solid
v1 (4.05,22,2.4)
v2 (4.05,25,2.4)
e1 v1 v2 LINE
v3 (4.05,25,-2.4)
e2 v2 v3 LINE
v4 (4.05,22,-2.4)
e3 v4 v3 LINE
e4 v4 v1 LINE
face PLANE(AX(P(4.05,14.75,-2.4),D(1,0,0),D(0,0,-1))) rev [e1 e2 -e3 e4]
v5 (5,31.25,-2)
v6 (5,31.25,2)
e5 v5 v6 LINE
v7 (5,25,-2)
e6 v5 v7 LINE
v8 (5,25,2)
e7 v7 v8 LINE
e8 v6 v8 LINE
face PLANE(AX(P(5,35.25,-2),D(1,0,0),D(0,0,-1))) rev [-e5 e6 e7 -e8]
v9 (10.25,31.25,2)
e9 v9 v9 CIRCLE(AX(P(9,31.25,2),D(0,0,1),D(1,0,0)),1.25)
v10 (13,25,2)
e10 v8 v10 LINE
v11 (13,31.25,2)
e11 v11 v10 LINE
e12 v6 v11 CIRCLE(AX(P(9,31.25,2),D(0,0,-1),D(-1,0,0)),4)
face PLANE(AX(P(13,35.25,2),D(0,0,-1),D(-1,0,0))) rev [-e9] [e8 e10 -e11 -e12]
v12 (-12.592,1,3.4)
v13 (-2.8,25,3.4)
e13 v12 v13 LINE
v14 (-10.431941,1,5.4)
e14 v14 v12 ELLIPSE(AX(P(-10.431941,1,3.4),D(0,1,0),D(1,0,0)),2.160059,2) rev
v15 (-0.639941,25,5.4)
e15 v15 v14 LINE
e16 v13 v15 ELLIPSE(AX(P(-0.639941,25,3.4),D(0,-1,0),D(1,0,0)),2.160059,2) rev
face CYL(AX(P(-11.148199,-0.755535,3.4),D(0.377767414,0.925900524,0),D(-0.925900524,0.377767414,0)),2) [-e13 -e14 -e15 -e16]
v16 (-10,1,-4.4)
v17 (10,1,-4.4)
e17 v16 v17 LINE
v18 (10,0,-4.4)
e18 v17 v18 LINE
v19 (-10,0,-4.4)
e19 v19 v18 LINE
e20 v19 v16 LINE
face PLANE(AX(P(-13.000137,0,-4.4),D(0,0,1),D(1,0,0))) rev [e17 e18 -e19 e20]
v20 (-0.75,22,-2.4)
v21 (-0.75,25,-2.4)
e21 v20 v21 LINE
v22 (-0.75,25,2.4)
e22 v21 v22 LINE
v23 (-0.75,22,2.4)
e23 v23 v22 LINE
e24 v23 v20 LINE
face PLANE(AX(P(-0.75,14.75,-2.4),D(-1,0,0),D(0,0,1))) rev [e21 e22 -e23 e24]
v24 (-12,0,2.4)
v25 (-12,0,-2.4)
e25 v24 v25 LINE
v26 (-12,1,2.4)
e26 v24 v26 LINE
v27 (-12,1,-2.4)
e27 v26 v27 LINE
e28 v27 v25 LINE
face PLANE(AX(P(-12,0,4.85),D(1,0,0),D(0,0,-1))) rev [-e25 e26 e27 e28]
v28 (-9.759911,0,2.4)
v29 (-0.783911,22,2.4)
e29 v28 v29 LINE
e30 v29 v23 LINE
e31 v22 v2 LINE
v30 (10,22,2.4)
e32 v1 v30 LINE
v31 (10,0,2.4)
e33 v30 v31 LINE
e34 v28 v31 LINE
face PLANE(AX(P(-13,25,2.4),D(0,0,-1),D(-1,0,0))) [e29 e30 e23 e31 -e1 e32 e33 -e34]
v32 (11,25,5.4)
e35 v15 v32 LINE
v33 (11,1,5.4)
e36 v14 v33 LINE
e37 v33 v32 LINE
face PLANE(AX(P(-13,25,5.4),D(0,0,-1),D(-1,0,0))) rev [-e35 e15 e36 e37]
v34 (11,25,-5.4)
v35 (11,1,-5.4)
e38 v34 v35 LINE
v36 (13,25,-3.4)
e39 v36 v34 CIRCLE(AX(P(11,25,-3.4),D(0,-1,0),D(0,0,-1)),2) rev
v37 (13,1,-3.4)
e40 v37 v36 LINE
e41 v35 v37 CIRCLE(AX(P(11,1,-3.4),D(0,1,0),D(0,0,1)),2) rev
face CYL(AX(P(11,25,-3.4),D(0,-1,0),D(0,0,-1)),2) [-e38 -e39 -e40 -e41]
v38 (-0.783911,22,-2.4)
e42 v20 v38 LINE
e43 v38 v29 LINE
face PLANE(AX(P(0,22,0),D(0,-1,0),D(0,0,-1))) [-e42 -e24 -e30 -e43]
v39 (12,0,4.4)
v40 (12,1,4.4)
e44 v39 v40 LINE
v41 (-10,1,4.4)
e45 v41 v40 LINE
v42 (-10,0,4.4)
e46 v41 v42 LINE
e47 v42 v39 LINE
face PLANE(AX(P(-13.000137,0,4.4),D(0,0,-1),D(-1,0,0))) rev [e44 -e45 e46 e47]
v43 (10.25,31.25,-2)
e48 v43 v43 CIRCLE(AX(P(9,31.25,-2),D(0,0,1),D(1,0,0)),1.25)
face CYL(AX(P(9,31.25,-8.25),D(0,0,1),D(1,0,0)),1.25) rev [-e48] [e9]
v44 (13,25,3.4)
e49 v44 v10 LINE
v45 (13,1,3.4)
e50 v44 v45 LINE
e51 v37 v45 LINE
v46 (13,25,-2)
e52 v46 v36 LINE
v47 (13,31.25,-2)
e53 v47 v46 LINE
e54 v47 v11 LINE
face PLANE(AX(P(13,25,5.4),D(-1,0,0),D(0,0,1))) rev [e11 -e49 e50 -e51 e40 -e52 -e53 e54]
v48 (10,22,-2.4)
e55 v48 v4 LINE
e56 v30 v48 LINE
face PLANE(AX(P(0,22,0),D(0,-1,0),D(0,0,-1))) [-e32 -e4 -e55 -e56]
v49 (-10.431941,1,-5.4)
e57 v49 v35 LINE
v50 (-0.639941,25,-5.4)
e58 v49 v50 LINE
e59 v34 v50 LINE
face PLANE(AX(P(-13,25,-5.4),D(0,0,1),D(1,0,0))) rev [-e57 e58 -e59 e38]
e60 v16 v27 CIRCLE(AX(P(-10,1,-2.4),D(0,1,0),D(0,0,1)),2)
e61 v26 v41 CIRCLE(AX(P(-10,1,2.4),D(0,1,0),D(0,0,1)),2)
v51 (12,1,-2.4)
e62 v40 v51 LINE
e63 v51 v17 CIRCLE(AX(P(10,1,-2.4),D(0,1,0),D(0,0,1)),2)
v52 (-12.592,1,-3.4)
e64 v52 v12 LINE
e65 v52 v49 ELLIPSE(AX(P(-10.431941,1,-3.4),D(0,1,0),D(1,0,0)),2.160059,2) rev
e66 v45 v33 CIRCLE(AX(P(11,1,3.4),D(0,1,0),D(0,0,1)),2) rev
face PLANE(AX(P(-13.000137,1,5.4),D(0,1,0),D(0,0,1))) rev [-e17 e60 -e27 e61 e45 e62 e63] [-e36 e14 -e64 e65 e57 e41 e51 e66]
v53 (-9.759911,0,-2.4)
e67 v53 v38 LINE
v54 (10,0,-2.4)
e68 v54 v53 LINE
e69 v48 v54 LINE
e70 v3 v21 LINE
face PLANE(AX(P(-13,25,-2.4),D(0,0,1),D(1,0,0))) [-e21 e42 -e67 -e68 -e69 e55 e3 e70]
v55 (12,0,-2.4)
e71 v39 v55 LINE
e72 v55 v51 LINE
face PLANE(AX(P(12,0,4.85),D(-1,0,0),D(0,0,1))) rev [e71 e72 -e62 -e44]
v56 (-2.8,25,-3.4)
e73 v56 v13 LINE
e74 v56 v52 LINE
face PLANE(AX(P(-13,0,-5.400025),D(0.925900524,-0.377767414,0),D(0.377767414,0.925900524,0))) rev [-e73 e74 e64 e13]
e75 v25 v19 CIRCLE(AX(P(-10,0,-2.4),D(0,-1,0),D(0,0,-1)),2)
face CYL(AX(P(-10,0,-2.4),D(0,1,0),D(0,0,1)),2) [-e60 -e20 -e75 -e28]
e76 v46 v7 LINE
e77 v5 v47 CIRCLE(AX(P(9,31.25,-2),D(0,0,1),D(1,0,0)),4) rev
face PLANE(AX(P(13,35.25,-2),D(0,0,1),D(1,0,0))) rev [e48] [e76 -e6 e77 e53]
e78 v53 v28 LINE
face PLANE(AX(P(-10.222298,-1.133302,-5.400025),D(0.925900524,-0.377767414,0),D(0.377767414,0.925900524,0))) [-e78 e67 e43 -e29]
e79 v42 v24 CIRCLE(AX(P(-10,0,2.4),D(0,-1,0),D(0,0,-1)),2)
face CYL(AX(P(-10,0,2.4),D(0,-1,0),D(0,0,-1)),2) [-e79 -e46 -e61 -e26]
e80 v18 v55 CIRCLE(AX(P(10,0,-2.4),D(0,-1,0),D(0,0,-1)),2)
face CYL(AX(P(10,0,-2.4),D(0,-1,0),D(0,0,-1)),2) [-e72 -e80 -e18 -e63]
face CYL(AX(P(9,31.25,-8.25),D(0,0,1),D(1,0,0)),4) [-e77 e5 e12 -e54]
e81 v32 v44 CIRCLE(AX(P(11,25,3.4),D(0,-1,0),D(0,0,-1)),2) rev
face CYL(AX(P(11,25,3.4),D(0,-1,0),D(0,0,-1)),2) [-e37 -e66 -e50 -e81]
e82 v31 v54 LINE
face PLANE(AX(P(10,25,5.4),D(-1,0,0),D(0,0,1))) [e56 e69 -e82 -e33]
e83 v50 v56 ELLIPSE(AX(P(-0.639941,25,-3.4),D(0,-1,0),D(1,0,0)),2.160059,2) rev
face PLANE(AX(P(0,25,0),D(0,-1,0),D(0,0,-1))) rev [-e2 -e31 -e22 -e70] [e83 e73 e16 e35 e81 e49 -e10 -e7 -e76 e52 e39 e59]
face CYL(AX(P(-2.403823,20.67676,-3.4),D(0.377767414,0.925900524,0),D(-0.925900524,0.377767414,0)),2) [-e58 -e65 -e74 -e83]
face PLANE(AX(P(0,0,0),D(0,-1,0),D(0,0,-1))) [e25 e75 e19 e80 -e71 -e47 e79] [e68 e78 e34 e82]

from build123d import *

# Parameters (mm, degrees)
SKETCH1_W           = 26
SKETCH1_H           = 10.8
BOSS_EXTRUDE1_DEPTH = 25
SKETCH2_W           = 8
SKETCH2_H           = 4
BOSS_EXTRUDE2_DEPTH = 10.25
SKETCH3_R           = 1.25
CUT_EXTRUDE1_DEPTH  = 10.25
CUT_EXTRUDE2_DEPTH  = 40.092230686
SHELL1_START        = -2.4
SHELL1_DEPTH        = 4.8
SKETCH5_W           = 4.8
SKETCH5_H           = 4.8
CUT_EXTRUDE3_DEPTH  = 10.25
SKETCH6_W           = 1
SKETCH6_H           = 1
CUT_EXTRUDE4_DEPTH  = 45.133009188
SKETCH7_W           = 1
SKETCH7_H           = 1
CUT_EXTRUDE5_DEPTH  = 10.25
FILLET1_R           = 2
FILLET2_R           = 2


# Read off the part's stored shape, not the designer's step: Shell1
with BuildPart() as part:
    # Sketch1 → Boss-Extrude1 (new body)
    with BuildSketch(Plane(origin=(0, 0, 0), x_dir=(1, 0, 0), z_dir=(0, 1, 0))):
        Rectangle(SKETCH1_W, SKETCH1_H)
    extrude(amount=BOSS_EXTRUDE1_DEPTH)

    # Sketch2 → Boss-Extrude2 (add)
    with BuildSketch(Plane(origin=(0, 25, 0), x_dir=(1, 0, 0), z_dir=(0, 1, 0))):
        with Locations((9, 0)):
            Rectangle(SKETCH2_W, SKETCH2_H)
    extrude(amount=BOSS_EXTRUDE2_DEPTH)

    # Sketch3 → Cut-Extrude1 (cut)
    with BuildSketch(Plane.XY.offset(2)):
        with Locations((9, 31.25)):
            Circle(SKETCH3_R)
        with BuildLine():
            Line((5, 31.25), (5, 37.25))
            Line((5, 37.25), (13, 37.25))
            Line((13, 37.25), (13, 31.25))
            ThreePointArc((13, 31.25), (9, 35.25), (5, 31.25))
        make_face()
    extrude(amount=-CUT_EXTRUDE1_DEPTH, mode=Mode.SUBTRACT)

    # Sketch4 → Cut-Extrude2 (cut, through all)
    with BuildSketch(Plane.XY.offset(5.4)):
        Polygon((-13, 0), (-2.8, 25), (-13, 25), align=None)
    extrude(amount=-CUT_EXTRUDE2_DEPTH, mode=Mode.SUBTRACT)

    # Shell1 outline → Shell1 (cut)
    with BuildSketch(Plane.XY.offset(SHELL1_START)):
        Polygon((10, 0), (10, 22), (-0.783911112, 22), (-9.759911112, 0), align=None)
    extrude(amount=SHELL1_DEPTH, mode=Mode.SUBTRACT)

    # Sketch5 → Cut-Extrude3 (cut)
    with BuildSketch(Plane(origin=(0, 25, 0), x_dir=(1, 0, 0), z_dir=(0, 1, 0))):
        with Locations((1.65, 0)):
            Rectangle(SKETCH5_W, SKETCH5_H)
    extrude(amount=-CUT_EXTRUDE3_DEPTH, mode=Mode.SUBTRACT)

    # Sketch6 → Cut-Extrude4 (cut, through all)
    with BuildSketch(Plane(origin=(13, 0, 0), x_dir=(0, 0, -1), z_dir=(1, 0, 0))):
        with Locations((-4.9, 0.5)):
            Rectangle(SKETCH6_W, SKETCH6_H)
        with Locations((4.9, 0.5)):
            Rectangle(SKETCH6_W, SKETCH6_H)
    extrude(amount=-CUT_EXTRUDE4_DEPTH, mode=Mode.SUBTRACT)

    # Sketch7 → Cut-Extrude5 (cut)
    with BuildSketch(Plane(origin=(0, 0, -5.4), x_dir=(-1, 0, 0), z_dir=(0, 0, -1))):
        with Locations((-12.5, 0.5)):
            Rectangle(SKETCH7_W, SKETCH7_H)
        with Locations((12.5, 0.5)):
            Rectangle(SKETCH7_W, SKETCH7_H)
    extrude(amount=-CUT_EXTRUDE5_DEPTH, mode=Mode.SUBTRACT)

    # Fillet1
    fillet1_edges = [part.edges().sort_by_distance(p)[0] for p in [
        (13, 13, 5.4),
        (-7.696, 13, 5.4),
        (-7.696, 13, -5.4),
        (13, 13, -5.4),
    ]]
    fillet(fillet1_edges, radius=FILLET1_R)

    # Fillet2
    fillet2_edges = [part.edges().sort_by_distance(p)[0] for p in [
        (12, 0.5, -4.4),
        (-12, 0.5, -4.4),
        (-12, 0.5, 4.4),
    ]]
    fillet(fillet2_edges, radius=FILLET2_R)


solid = part.part
